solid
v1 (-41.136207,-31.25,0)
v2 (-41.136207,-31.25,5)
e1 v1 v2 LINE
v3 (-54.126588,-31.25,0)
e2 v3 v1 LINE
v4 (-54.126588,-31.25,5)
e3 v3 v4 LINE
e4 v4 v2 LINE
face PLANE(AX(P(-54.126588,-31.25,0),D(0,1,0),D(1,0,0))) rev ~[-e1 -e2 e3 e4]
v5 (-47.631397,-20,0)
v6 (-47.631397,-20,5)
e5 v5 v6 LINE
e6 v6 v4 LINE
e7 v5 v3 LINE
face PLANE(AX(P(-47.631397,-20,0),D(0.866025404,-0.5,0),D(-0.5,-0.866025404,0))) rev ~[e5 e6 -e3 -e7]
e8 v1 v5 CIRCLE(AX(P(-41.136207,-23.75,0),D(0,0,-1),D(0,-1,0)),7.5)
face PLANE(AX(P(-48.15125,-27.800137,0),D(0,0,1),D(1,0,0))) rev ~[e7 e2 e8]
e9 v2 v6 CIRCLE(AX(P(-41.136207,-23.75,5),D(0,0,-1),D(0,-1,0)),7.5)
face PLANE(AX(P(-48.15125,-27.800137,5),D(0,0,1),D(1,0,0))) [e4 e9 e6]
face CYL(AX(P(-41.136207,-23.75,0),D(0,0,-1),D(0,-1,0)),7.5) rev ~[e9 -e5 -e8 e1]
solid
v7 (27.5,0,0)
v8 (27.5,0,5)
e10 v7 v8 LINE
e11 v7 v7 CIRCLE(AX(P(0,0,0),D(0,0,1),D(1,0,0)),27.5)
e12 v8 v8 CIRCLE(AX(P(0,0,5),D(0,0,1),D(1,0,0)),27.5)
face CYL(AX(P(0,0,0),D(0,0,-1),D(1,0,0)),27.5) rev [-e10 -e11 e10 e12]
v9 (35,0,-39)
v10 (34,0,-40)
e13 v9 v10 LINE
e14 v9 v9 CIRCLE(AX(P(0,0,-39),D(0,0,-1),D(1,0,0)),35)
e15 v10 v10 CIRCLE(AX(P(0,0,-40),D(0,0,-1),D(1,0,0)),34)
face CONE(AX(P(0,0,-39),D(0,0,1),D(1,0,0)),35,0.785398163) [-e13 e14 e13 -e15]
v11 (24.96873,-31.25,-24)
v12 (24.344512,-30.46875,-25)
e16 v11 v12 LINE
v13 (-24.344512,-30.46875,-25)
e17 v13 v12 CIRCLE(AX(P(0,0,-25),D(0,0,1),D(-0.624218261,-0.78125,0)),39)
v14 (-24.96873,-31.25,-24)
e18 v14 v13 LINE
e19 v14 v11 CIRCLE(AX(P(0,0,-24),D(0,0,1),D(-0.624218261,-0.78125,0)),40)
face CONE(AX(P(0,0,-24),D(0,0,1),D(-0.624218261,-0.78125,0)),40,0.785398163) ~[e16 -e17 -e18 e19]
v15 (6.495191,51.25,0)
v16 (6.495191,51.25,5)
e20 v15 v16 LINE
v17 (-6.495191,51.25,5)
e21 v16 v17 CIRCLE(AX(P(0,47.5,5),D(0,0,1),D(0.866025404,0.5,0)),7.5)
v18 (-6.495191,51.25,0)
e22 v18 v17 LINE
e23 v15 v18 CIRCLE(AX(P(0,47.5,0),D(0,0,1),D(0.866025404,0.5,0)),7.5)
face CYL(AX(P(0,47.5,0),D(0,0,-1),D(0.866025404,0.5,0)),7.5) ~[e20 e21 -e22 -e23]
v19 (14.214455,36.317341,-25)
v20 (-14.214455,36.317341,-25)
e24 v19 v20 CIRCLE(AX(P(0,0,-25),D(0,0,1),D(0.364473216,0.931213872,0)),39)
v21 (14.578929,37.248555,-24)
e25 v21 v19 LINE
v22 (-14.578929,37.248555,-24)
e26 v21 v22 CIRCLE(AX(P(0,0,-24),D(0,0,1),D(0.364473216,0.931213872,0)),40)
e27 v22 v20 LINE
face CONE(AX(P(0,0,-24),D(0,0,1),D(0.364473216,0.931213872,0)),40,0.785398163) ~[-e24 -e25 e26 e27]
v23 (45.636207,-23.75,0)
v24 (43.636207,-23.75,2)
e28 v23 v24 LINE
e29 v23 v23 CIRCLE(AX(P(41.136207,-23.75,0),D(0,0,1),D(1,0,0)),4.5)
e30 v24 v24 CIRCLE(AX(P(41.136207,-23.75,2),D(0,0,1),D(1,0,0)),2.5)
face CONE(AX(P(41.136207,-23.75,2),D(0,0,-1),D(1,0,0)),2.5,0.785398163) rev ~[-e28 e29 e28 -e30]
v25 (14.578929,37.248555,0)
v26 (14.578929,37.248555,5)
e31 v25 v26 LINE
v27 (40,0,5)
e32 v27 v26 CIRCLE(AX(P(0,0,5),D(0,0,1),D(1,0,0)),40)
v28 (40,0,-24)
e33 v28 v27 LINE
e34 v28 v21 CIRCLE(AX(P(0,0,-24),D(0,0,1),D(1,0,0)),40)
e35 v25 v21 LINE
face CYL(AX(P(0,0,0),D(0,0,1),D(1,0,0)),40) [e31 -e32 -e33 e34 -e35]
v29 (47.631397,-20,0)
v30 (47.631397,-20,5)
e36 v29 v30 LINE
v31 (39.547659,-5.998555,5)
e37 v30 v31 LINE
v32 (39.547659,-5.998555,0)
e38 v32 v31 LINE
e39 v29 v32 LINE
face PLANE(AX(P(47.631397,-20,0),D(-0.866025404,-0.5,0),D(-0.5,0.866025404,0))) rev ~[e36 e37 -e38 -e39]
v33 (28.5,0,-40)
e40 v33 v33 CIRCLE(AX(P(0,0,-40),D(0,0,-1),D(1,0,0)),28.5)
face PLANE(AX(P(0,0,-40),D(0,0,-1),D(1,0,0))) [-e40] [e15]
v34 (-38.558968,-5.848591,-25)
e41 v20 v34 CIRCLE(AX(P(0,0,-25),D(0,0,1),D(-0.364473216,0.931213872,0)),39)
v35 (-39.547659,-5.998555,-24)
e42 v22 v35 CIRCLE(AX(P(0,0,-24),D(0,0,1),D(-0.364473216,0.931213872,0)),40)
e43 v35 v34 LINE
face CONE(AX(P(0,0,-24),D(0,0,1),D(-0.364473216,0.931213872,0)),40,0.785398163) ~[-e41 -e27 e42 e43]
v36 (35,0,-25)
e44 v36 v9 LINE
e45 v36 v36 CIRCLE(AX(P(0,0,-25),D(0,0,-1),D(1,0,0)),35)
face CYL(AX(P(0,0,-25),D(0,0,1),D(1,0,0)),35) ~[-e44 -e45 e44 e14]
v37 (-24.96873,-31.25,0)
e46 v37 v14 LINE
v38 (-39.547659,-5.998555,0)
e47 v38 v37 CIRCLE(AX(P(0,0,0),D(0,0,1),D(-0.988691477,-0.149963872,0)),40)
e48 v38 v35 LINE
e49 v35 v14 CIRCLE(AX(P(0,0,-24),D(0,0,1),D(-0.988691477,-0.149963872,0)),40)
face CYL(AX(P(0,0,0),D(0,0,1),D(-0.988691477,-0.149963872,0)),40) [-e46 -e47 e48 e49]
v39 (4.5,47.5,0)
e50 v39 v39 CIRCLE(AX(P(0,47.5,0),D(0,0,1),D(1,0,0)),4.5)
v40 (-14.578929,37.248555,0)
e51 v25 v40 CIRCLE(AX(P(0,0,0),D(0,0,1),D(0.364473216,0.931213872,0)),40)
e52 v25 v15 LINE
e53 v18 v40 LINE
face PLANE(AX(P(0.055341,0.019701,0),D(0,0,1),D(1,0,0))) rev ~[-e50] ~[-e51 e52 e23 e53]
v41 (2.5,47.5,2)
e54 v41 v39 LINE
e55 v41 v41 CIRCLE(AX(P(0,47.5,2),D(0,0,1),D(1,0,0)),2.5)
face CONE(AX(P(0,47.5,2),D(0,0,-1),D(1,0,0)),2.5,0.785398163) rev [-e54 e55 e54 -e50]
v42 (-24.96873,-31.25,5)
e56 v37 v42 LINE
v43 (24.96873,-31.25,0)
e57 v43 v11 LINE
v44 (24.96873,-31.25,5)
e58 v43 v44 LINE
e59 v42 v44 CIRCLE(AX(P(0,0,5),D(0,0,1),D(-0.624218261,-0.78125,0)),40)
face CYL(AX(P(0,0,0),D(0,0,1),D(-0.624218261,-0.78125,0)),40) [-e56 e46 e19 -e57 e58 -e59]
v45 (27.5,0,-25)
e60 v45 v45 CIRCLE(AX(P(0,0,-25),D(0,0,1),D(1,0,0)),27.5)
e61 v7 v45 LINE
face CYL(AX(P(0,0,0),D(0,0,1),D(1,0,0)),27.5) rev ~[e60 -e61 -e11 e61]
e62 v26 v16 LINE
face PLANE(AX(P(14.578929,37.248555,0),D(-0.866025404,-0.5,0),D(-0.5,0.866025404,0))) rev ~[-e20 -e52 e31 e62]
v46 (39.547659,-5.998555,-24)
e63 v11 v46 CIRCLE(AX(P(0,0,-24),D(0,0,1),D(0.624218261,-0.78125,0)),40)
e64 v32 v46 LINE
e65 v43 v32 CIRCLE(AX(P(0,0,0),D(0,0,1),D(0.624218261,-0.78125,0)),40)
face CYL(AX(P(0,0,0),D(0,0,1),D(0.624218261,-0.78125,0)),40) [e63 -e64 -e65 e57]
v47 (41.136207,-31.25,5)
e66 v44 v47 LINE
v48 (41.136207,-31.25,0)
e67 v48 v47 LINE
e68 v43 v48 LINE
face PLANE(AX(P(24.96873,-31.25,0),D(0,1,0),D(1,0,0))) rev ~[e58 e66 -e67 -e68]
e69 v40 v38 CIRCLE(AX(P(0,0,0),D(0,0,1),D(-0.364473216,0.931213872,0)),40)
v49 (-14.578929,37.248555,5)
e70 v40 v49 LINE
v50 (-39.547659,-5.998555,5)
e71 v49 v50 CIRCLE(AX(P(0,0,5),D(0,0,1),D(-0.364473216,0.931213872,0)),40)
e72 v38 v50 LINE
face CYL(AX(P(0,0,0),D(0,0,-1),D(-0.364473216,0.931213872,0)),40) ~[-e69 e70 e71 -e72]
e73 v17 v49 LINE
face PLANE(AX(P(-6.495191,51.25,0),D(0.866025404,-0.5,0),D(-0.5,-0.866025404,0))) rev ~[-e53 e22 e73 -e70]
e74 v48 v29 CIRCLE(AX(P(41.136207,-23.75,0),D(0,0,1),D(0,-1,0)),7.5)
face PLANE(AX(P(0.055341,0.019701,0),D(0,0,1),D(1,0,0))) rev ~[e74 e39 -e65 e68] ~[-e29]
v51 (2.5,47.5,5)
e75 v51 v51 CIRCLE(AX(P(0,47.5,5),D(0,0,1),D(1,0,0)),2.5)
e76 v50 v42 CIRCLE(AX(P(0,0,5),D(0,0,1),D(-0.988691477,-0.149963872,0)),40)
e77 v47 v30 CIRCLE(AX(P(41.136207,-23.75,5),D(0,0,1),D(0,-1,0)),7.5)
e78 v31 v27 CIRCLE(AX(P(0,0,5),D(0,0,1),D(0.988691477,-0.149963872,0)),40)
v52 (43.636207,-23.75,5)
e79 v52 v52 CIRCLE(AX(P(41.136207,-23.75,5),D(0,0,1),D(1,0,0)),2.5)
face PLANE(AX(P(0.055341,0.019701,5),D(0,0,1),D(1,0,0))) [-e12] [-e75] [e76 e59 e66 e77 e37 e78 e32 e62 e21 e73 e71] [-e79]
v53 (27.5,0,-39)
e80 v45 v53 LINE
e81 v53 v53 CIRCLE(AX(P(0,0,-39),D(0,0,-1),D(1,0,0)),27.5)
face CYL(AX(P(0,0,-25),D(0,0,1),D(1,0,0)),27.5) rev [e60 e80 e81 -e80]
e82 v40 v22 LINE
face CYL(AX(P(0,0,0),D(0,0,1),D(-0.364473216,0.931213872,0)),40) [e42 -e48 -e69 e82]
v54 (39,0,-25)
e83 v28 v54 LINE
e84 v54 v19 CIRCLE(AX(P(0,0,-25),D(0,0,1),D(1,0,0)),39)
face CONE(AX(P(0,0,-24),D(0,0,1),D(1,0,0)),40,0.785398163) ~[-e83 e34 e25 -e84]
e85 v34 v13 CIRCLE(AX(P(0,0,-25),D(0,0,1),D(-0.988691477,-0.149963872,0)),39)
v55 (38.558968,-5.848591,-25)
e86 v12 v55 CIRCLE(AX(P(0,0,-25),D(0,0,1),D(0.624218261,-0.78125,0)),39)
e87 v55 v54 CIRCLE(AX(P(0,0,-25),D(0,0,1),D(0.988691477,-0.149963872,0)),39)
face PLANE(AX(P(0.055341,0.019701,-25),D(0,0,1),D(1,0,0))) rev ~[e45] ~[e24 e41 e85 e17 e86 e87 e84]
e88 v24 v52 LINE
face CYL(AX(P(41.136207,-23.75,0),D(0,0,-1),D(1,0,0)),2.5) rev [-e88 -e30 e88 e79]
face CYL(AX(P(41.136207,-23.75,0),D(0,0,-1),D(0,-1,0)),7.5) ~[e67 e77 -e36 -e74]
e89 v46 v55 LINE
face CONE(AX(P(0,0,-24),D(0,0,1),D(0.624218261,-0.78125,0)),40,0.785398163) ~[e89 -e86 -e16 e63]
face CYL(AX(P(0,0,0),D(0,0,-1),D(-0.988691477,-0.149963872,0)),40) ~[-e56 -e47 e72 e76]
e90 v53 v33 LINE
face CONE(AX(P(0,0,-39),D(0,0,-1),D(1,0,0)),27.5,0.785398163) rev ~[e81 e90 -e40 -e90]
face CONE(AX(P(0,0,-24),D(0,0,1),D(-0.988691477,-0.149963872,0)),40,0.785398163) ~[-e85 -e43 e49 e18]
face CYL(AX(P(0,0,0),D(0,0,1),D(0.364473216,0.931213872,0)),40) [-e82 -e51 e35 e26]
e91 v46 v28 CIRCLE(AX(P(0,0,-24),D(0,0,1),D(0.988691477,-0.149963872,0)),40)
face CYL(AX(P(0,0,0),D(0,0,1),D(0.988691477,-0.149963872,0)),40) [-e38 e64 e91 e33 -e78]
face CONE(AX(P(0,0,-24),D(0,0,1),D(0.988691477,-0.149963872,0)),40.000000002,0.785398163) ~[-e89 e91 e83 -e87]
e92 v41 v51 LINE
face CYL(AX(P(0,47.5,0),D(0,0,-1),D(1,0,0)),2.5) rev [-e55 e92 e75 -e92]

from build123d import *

# Parameters (mm, degrees)
F0_R     = 27.5
F0_R_2   = 2.5
F1_DEPTH = 5
F2_DEPTH = 25
F3_R     = 35
F3_R_2   = 27.5
F4_DEPTH = 15
F5_SIZE  = 2
F6_SIZE  = 1


with BuildPart() as f1:
    # F0 (on Top) → F1 (new body)
    with BuildSketch(Plane.XY):
        with BuildLine():
            ThreePointArc((39.5476590904, -5.998554865), (39.8867544657, -3.0077929104), (40, 0))
            ThreePointArc((40, 0), (33.0390461866, 22.5482023026), (14.5789286461, 37.248554865))
            ThreePointArc((14.5789286461, 37.248554865), (0, 40), (-14.5789286461, 37.248554865))
            ThreePointArc((-14.5789286461, 37.248554865), (-34.6410161514, 20), (-39.5476590904, -5.998554865))
            ThreePointArc((-39.5476590904, -5.998554865), (-34.6410161514, -20), (-24.9687304443, -31.25))
            ThreePointArc((-24.9687304443, -31.25), (0, -40), (24.9687304443, -31.25))
            ThreePointArc((24.9687304443, -31.25), (34.6410161514, -20), (39.5476590904, -5.998554865))
        make_face()
        Circle(F0_R, mode=Mode.SUBTRACT)
        with BuildLine():
            ThreePointArc((-14.5789286461, 37.248554865), (0, 40), (14.5789286461, 37.248554865))
            Line((14.5789286461, 37.248554865), (6.4951905284, 51.25))
            ThreePointArc((6.4951905284, 51.25), (0, 55), (-6.4951905284, 51.25))
            Line((-6.4951905284, 51.25), (-14.5789286461, 37.248554865))
        make_face()
        with Locations((0, 47.5)):
            Circle(F0_R_2, mode=Mode.SUBTRACT)
        with BuildLine():
            Line((47.6313972081, -20), (39.5476590904, -5.998554865))
            ThreePointArc((39.5476590904, -5.998554865), (34.6410161514, -20), (24.9687304443, -31.25))
            Line((24.9687304443, -31.25), (41.1362066798, -31.25))
            ThreePointArc((41.1362066798, -31.25), (47.6313972081, -27.5), (47.6313972081, -20))
        make_face()
        with Locations((41.1362066798, -23.75)):
            Circle(F0_R_2, mode=Mode.SUBTRACT)
    extrude(amount=F1_DEPTH)

    # F0 (on Top) → F2 (join)
    with BuildSketch(Plane.XY):
        with BuildLine():
            ThreePointArc((39.5476590904, -5.998554865), (39.8867544657, -3.0077929104), (40, 0))
            ThreePointArc((40, 0), (33.0390461866, 22.5482023026), (14.5789286461, 37.248554865))
            ThreePointArc((14.5789286461, 37.248554865), (0, 40), (-14.5789286461, 37.248554865))
            ThreePointArc((-14.5789286461, 37.248554865), (-34.6410161514, 20), (-39.5476590904, -5.998554865))
            ThreePointArc((-39.5476590904, -5.998554865), (-34.6410161514, -20), (-24.9687304443, -31.25))
            ThreePointArc((-24.9687304443, -31.25), (0, -40), (24.9687304443, -31.25))
            ThreePointArc((24.9687304443, -31.25), (34.6410161514, -20), (39.5476590904, -5.998554865))
        make_face()
        Circle(F0_R, mode=Mode.SUBTRACT)
    extrude(amount=-F2_DEPTH)

    # F3 (on face) → F4 (join)
    with BuildSketch(Plane(origin=(0, 0, -25), x_dir=(1, 0, 0), z_dir=(0, 0, -1))):
        Circle(F3_R)
        Circle(F3_R_2, mode=Mode.SUBTRACT)
    extrude(amount=F4_DEPTH)

    # F5
    f5_edges = [f1.edges().sort_by_distance(p)[0] for p in [
        (-2.5, 47.5, 0),
        (38.636207, -23.75, 0),
    ]]
    chamfer(f5_edges, length=F5_SIZE)

    # F6
    f6_edges = [f1.edges().sort_by_distance(p)[0] for p in [
        (39.547659, 5.998555, -25),
        (-35, 0, -40),
        (-27.5, 0, -40),
    ]]
    chamfer(f6_edges, length=F6_SIZE)


with BuildPart() as f1b:
    # F0 (on Top) → F1, piece 2 (new body)
    with BuildSketch(Plane.XY):
        with BuildLine():
            ThreePointArc((-41.1362066798, -31.25), (-47.6313972081, -27.5), (-47.6313972081, -20))
            Line((-47.6313972081, -20), (-54.1265877365, -31.25))
            Line((-54.1265877365, -31.25), (-41.1362066798, -31.25))
        make_face()
    extrude(amount=F1_DEPTH)


solid = Compound([f1.part, f1b.part])
